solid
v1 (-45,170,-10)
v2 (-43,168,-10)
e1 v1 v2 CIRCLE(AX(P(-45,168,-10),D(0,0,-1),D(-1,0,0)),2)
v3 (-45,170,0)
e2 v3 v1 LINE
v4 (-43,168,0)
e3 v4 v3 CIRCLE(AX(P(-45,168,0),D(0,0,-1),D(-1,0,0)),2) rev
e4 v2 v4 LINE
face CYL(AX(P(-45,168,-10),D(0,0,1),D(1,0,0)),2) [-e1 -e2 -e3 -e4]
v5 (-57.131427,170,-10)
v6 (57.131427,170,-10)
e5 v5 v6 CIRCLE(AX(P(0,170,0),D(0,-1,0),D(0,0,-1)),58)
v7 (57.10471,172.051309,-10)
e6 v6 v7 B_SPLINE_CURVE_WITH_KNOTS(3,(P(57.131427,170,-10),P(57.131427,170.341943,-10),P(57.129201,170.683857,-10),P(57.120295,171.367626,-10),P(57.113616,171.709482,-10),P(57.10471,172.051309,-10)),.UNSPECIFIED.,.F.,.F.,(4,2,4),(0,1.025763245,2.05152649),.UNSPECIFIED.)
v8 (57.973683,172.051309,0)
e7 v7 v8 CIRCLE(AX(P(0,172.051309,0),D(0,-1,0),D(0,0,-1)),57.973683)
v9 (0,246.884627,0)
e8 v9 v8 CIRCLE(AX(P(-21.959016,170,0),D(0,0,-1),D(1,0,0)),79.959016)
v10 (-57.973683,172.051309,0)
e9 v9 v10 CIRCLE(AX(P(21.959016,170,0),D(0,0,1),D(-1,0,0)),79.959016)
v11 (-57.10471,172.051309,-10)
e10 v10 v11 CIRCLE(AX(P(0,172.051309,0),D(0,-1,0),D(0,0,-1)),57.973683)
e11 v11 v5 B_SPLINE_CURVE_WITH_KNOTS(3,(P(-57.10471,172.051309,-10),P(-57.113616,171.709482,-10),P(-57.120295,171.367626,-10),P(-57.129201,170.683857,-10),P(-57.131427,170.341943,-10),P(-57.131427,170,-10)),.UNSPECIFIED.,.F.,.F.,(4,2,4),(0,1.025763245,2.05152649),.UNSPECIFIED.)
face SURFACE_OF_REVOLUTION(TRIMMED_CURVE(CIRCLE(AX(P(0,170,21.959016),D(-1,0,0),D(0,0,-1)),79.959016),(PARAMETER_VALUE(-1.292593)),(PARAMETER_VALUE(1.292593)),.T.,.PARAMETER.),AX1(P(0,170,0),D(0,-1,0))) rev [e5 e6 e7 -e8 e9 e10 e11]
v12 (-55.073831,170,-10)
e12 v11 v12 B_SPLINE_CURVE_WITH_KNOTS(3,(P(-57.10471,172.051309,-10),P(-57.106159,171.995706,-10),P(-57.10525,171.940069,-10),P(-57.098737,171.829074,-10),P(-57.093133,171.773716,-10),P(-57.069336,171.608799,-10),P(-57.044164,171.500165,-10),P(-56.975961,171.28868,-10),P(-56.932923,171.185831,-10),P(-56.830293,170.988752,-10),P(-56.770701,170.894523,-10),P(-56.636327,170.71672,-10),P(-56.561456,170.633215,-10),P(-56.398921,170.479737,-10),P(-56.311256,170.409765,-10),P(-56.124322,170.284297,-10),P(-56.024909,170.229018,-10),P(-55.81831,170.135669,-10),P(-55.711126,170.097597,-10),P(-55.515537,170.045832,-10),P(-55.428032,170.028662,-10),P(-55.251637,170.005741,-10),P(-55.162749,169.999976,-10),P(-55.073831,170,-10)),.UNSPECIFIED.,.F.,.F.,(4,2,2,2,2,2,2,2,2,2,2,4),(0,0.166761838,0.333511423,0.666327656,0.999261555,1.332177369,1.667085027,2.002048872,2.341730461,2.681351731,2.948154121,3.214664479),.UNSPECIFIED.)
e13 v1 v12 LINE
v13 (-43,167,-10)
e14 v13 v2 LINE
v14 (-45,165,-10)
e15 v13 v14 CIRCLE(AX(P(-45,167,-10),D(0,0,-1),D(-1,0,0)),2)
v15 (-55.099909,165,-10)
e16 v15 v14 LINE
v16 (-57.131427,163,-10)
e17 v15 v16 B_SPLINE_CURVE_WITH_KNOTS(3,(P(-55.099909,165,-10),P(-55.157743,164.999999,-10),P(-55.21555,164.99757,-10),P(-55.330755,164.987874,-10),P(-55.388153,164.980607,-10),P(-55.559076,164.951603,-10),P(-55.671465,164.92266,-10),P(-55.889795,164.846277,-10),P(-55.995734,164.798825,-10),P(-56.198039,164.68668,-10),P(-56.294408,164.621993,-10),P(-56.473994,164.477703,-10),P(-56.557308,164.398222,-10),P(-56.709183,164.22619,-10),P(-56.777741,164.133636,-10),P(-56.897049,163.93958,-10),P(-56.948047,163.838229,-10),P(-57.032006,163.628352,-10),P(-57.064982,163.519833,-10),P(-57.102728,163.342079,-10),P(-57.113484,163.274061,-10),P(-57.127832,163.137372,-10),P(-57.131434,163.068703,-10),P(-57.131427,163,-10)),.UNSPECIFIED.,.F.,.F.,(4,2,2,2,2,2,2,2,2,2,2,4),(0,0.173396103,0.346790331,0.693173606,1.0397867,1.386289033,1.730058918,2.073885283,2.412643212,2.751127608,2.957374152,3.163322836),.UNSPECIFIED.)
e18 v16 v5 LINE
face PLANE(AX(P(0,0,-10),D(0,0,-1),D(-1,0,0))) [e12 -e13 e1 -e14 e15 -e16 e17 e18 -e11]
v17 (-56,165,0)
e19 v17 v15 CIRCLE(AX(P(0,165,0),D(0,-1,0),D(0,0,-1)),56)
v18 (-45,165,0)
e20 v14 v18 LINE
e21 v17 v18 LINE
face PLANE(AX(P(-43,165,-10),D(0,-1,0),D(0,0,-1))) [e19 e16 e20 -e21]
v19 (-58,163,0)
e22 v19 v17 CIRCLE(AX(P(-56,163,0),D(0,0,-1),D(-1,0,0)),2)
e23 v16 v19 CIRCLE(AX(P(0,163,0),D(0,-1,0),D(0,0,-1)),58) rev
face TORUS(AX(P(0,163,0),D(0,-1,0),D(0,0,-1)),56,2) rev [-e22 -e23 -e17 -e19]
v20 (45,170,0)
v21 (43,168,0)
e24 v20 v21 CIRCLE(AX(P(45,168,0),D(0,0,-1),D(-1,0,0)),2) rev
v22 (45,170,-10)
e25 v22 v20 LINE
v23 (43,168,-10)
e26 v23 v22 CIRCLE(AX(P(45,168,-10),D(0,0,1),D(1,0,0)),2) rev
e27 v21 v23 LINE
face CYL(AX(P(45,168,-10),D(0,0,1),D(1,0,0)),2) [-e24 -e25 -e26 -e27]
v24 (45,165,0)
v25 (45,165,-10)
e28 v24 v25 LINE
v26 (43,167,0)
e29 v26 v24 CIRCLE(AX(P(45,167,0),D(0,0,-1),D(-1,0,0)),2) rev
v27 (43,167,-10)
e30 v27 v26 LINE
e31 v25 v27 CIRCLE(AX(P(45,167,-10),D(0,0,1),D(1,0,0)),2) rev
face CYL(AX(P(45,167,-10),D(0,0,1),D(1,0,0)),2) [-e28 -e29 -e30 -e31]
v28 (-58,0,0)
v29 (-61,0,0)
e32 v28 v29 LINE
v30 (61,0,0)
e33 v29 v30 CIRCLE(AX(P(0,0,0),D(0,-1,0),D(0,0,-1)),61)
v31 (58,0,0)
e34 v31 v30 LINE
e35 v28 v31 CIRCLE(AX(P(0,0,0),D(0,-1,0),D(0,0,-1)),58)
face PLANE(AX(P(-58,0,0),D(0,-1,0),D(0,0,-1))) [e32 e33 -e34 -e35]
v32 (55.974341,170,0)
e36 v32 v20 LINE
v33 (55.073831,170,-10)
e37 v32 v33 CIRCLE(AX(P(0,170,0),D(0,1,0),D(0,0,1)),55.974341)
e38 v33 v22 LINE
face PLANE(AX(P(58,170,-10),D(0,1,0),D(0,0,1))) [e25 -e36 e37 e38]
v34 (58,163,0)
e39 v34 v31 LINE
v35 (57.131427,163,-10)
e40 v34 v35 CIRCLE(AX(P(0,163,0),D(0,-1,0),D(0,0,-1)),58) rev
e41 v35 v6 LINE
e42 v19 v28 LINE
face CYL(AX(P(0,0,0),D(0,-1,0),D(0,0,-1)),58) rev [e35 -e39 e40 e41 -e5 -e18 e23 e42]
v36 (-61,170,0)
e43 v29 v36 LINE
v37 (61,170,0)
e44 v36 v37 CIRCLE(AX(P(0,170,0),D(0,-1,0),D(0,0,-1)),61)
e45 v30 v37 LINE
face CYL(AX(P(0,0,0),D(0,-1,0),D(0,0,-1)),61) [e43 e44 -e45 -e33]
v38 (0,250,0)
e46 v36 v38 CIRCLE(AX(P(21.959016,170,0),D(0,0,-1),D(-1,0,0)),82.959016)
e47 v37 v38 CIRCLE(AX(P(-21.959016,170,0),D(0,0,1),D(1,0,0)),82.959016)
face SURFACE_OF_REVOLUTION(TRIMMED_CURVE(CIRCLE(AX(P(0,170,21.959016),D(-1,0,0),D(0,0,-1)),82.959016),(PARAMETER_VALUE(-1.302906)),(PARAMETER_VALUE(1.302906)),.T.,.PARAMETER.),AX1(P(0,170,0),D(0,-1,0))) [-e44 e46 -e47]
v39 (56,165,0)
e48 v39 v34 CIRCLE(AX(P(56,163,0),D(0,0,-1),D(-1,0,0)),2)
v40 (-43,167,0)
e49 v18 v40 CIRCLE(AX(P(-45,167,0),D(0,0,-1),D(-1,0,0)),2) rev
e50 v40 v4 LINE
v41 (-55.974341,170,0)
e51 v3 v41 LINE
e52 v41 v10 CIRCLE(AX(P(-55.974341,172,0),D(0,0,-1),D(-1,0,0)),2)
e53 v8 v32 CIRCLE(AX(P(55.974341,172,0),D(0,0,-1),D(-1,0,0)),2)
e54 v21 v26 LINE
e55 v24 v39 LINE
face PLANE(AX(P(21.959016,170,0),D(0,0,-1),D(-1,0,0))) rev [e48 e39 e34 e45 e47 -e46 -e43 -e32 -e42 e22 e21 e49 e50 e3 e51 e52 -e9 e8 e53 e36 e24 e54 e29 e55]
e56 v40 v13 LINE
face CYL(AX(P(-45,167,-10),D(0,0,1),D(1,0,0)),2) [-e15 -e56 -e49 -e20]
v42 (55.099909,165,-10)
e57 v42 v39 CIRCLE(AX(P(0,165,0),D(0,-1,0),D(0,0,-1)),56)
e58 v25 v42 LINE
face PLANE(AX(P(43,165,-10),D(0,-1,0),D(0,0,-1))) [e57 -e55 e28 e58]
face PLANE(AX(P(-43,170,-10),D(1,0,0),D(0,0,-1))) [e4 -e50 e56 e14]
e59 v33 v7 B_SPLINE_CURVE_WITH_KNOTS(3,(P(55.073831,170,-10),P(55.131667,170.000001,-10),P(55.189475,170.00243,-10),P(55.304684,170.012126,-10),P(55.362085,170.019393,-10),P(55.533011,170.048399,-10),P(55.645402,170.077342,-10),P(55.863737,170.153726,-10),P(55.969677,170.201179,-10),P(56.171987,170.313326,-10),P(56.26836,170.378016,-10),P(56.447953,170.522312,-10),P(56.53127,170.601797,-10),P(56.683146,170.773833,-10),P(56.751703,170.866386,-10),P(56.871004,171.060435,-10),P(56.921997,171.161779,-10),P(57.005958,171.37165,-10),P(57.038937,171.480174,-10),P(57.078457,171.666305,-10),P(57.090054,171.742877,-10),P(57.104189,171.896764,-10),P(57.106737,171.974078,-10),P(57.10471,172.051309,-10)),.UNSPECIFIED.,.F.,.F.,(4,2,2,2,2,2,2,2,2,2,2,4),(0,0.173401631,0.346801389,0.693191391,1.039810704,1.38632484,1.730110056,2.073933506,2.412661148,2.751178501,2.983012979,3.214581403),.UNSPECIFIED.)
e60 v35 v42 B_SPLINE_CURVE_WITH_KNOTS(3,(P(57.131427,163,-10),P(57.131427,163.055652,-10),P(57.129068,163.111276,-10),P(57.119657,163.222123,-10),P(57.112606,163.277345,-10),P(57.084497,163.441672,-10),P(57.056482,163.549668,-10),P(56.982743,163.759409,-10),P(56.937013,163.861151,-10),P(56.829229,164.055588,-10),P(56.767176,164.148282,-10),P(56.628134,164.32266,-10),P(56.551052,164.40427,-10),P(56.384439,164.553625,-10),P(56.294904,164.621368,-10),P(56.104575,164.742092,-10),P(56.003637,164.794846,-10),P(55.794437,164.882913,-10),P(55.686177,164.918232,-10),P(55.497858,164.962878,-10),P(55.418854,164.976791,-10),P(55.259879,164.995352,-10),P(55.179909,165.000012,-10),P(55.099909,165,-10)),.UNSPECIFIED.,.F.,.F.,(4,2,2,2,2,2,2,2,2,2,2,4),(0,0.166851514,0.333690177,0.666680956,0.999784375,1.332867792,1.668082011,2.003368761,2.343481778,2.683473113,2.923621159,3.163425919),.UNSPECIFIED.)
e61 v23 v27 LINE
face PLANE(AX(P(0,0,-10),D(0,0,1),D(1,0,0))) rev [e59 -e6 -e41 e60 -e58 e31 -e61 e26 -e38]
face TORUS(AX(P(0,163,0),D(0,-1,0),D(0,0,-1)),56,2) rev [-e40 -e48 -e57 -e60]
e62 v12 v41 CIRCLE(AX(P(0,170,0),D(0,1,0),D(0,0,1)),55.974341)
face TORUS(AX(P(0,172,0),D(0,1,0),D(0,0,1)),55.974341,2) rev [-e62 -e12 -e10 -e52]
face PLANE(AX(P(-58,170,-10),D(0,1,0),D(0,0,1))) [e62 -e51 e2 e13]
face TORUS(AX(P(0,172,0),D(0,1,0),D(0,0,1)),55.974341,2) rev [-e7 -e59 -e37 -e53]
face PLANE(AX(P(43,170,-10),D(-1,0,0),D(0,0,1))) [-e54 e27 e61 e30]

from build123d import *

# Parameters (mm, degrees)
REVOLVE1_ANGLE      = 180
SKETCH2_W           = 15
SKETCH2_H           = 5
BOSS_EXTRUDE1_DEPTH = 10
FILLET2_R           = 2
FILLET3_R           = 2
FILLET4_R           = 2
FILLET5_R           = 2
FILLET6_R           = 2


with BuildPart() as part:
    # Sketch1 → Revolve1 (revolve)
    with BuildSketch(Plane.XY):
        with BuildLine():
            Line((61, 170), (61, 0))
            Line((61, 0), (58, 0))
            Line((58, 0), (58, 170))
            ThreePointArc((58, 170), (41.873834296, 218.154039035), (0, 246.884627213))
            Line((0, 246.884627213), (0, 250))
            ThreePointArc((0, 250), (44.010282534, 220.301590432), (61, 170))
        make_face()
    revolve(axis=Axis((0, 0, 0), (0, 1, 0)), revolution_arc=REVOLVE1_ANGLE)

    # Sketch2 → Boss-Extrude1 (add)
    with BuildSketch(Plane.XY):
        with Locations((50.5, 167.5)):
            Rectangle(SKETCH2_W, SKETCH2_H)
        with Locations((-50.5, 167.5)):
            Rectangle(SKETCH2_W, SKETCH2_H)
    extrude(amount=-BOSS_EXTRUDE1_DEPTH)

    # Fillet2
    # the kernel refuses this fillet: 2 mm, written as the material it adds along each edge
    with BuildSketch(Plane(origin=(0, 170, 0), x_dir=(1, 0, 0), z_dir=(0, 0, 1))) as fillet2_piece_1_section:
        with BuildLine():
            CenterArc((55.974341272, 2), FILLET2_R, 270, 91.470056164)
            Line((55.974341272, 0), (58, 0))
            ThreePointArc((58, 0), (57.993420482, 1.025738909), (57.97368301, 2.051309011))
        make_face()
    fillet2_piece_1 = revolve(axis=Axis((0, 170, 0), (0, 1, 0)), revolution_arc=14.994639912, mode=Mode.PRIVATE)
    fillet2_piece_1 = split(fillet2_piece_1, bisect_by=Plane(origin=(57.246854663, 170.465829225, -10), z_dir=(0, 0, 1)), keep=Keep.TOP, mode=Mode.PRIVATE)
    add(fillet2_piece_1)
    with BuildSketch(Plane(origin=(0, 170, 0), x_dir=(-0.9659500348920197, 0, -0.2587286804590979), z_dir=(0.2587286804590979, 0, -0.9659500348920197))) as fillet2_piece_2_section:
        with BuildLine():
            CenterArc((55.974341272, 2), FILLET2_R, 270, 91.470056164)
            Line((55.974341272, 0), (58, 0))
            ThreePointArc((58, 0), (57.993420482, 1.025738909), (57.97368301, 2.051309011))
        make_face()
    fillet2_piece_2 = revolve(axis=Axis((0, 170, 0), (0, 1, 0)), revolution_arc=14.994639912, mode=Mode.PRIVATE)
    fillet2_piece_2 = split(fillet2_piece_2, bisect_by=Plane(origin=(-57.246854909, 170.465829269, -10), z_dir=(0, 0, 1)), keep=Keep.TOP, mode=Mode.PRIVATE)
    add(fillet2_piece_2)
    # the kernel refuses this fillet: 2 mm, written as the material it takes off along each edge
    with BuildSketch(Plane(origin=(43, 170, 5), x_dir=(0, -1, 0), z_dir=(0, 0, -1)), Plane(origin=(-43, 170, 5), x_dir=(-1, 0, 0), z_dir=(0, 0, -1))) as fillet2_2_piece_1:
        with BuildLine():
            CenterArc((FILLET2_R, -FILLET2_R), FILLET2_R, 90, 90)
            Line((0, -FILLET2_R), (0, 0))
            Line((0, 0), (FILLET2_R, 0))
        make_face()
    extrude(amount=20, mode=Mode.SUBTRACT)

    # Fillet3
    fillet3_edges = [part.edges().sort_by_distance(p)[0] for p in [
        (57.782448853, 165, -5.01882502),
    ]]
    fillet(fillet3_edges, radius=FILLET3_R)

    # Fillet4
    fillet4_edges = [part.edges().sort_by_distance(p)[0] for p in [
        (-57.782448853, 165, -5.01882502),
    ]]
    fillet(fillet4_edges, radius=FILLET4_R)

    # Fillet5
    fillet5_edges = [part.edges().sort_by_distance(p)[0] for p in [
        (-43, 165, -5),
    ]]
    fillet(fillet5_edges, radius=FILLET5_R)

    # Fillet6
    fillet6_edges = [part.edges().sort_by_distance(p)[0] for p in [
        (43, 165, -5),
    ]]
    fillet(fillet6_edges, radius=FILLET6_R)


solid = part.part
